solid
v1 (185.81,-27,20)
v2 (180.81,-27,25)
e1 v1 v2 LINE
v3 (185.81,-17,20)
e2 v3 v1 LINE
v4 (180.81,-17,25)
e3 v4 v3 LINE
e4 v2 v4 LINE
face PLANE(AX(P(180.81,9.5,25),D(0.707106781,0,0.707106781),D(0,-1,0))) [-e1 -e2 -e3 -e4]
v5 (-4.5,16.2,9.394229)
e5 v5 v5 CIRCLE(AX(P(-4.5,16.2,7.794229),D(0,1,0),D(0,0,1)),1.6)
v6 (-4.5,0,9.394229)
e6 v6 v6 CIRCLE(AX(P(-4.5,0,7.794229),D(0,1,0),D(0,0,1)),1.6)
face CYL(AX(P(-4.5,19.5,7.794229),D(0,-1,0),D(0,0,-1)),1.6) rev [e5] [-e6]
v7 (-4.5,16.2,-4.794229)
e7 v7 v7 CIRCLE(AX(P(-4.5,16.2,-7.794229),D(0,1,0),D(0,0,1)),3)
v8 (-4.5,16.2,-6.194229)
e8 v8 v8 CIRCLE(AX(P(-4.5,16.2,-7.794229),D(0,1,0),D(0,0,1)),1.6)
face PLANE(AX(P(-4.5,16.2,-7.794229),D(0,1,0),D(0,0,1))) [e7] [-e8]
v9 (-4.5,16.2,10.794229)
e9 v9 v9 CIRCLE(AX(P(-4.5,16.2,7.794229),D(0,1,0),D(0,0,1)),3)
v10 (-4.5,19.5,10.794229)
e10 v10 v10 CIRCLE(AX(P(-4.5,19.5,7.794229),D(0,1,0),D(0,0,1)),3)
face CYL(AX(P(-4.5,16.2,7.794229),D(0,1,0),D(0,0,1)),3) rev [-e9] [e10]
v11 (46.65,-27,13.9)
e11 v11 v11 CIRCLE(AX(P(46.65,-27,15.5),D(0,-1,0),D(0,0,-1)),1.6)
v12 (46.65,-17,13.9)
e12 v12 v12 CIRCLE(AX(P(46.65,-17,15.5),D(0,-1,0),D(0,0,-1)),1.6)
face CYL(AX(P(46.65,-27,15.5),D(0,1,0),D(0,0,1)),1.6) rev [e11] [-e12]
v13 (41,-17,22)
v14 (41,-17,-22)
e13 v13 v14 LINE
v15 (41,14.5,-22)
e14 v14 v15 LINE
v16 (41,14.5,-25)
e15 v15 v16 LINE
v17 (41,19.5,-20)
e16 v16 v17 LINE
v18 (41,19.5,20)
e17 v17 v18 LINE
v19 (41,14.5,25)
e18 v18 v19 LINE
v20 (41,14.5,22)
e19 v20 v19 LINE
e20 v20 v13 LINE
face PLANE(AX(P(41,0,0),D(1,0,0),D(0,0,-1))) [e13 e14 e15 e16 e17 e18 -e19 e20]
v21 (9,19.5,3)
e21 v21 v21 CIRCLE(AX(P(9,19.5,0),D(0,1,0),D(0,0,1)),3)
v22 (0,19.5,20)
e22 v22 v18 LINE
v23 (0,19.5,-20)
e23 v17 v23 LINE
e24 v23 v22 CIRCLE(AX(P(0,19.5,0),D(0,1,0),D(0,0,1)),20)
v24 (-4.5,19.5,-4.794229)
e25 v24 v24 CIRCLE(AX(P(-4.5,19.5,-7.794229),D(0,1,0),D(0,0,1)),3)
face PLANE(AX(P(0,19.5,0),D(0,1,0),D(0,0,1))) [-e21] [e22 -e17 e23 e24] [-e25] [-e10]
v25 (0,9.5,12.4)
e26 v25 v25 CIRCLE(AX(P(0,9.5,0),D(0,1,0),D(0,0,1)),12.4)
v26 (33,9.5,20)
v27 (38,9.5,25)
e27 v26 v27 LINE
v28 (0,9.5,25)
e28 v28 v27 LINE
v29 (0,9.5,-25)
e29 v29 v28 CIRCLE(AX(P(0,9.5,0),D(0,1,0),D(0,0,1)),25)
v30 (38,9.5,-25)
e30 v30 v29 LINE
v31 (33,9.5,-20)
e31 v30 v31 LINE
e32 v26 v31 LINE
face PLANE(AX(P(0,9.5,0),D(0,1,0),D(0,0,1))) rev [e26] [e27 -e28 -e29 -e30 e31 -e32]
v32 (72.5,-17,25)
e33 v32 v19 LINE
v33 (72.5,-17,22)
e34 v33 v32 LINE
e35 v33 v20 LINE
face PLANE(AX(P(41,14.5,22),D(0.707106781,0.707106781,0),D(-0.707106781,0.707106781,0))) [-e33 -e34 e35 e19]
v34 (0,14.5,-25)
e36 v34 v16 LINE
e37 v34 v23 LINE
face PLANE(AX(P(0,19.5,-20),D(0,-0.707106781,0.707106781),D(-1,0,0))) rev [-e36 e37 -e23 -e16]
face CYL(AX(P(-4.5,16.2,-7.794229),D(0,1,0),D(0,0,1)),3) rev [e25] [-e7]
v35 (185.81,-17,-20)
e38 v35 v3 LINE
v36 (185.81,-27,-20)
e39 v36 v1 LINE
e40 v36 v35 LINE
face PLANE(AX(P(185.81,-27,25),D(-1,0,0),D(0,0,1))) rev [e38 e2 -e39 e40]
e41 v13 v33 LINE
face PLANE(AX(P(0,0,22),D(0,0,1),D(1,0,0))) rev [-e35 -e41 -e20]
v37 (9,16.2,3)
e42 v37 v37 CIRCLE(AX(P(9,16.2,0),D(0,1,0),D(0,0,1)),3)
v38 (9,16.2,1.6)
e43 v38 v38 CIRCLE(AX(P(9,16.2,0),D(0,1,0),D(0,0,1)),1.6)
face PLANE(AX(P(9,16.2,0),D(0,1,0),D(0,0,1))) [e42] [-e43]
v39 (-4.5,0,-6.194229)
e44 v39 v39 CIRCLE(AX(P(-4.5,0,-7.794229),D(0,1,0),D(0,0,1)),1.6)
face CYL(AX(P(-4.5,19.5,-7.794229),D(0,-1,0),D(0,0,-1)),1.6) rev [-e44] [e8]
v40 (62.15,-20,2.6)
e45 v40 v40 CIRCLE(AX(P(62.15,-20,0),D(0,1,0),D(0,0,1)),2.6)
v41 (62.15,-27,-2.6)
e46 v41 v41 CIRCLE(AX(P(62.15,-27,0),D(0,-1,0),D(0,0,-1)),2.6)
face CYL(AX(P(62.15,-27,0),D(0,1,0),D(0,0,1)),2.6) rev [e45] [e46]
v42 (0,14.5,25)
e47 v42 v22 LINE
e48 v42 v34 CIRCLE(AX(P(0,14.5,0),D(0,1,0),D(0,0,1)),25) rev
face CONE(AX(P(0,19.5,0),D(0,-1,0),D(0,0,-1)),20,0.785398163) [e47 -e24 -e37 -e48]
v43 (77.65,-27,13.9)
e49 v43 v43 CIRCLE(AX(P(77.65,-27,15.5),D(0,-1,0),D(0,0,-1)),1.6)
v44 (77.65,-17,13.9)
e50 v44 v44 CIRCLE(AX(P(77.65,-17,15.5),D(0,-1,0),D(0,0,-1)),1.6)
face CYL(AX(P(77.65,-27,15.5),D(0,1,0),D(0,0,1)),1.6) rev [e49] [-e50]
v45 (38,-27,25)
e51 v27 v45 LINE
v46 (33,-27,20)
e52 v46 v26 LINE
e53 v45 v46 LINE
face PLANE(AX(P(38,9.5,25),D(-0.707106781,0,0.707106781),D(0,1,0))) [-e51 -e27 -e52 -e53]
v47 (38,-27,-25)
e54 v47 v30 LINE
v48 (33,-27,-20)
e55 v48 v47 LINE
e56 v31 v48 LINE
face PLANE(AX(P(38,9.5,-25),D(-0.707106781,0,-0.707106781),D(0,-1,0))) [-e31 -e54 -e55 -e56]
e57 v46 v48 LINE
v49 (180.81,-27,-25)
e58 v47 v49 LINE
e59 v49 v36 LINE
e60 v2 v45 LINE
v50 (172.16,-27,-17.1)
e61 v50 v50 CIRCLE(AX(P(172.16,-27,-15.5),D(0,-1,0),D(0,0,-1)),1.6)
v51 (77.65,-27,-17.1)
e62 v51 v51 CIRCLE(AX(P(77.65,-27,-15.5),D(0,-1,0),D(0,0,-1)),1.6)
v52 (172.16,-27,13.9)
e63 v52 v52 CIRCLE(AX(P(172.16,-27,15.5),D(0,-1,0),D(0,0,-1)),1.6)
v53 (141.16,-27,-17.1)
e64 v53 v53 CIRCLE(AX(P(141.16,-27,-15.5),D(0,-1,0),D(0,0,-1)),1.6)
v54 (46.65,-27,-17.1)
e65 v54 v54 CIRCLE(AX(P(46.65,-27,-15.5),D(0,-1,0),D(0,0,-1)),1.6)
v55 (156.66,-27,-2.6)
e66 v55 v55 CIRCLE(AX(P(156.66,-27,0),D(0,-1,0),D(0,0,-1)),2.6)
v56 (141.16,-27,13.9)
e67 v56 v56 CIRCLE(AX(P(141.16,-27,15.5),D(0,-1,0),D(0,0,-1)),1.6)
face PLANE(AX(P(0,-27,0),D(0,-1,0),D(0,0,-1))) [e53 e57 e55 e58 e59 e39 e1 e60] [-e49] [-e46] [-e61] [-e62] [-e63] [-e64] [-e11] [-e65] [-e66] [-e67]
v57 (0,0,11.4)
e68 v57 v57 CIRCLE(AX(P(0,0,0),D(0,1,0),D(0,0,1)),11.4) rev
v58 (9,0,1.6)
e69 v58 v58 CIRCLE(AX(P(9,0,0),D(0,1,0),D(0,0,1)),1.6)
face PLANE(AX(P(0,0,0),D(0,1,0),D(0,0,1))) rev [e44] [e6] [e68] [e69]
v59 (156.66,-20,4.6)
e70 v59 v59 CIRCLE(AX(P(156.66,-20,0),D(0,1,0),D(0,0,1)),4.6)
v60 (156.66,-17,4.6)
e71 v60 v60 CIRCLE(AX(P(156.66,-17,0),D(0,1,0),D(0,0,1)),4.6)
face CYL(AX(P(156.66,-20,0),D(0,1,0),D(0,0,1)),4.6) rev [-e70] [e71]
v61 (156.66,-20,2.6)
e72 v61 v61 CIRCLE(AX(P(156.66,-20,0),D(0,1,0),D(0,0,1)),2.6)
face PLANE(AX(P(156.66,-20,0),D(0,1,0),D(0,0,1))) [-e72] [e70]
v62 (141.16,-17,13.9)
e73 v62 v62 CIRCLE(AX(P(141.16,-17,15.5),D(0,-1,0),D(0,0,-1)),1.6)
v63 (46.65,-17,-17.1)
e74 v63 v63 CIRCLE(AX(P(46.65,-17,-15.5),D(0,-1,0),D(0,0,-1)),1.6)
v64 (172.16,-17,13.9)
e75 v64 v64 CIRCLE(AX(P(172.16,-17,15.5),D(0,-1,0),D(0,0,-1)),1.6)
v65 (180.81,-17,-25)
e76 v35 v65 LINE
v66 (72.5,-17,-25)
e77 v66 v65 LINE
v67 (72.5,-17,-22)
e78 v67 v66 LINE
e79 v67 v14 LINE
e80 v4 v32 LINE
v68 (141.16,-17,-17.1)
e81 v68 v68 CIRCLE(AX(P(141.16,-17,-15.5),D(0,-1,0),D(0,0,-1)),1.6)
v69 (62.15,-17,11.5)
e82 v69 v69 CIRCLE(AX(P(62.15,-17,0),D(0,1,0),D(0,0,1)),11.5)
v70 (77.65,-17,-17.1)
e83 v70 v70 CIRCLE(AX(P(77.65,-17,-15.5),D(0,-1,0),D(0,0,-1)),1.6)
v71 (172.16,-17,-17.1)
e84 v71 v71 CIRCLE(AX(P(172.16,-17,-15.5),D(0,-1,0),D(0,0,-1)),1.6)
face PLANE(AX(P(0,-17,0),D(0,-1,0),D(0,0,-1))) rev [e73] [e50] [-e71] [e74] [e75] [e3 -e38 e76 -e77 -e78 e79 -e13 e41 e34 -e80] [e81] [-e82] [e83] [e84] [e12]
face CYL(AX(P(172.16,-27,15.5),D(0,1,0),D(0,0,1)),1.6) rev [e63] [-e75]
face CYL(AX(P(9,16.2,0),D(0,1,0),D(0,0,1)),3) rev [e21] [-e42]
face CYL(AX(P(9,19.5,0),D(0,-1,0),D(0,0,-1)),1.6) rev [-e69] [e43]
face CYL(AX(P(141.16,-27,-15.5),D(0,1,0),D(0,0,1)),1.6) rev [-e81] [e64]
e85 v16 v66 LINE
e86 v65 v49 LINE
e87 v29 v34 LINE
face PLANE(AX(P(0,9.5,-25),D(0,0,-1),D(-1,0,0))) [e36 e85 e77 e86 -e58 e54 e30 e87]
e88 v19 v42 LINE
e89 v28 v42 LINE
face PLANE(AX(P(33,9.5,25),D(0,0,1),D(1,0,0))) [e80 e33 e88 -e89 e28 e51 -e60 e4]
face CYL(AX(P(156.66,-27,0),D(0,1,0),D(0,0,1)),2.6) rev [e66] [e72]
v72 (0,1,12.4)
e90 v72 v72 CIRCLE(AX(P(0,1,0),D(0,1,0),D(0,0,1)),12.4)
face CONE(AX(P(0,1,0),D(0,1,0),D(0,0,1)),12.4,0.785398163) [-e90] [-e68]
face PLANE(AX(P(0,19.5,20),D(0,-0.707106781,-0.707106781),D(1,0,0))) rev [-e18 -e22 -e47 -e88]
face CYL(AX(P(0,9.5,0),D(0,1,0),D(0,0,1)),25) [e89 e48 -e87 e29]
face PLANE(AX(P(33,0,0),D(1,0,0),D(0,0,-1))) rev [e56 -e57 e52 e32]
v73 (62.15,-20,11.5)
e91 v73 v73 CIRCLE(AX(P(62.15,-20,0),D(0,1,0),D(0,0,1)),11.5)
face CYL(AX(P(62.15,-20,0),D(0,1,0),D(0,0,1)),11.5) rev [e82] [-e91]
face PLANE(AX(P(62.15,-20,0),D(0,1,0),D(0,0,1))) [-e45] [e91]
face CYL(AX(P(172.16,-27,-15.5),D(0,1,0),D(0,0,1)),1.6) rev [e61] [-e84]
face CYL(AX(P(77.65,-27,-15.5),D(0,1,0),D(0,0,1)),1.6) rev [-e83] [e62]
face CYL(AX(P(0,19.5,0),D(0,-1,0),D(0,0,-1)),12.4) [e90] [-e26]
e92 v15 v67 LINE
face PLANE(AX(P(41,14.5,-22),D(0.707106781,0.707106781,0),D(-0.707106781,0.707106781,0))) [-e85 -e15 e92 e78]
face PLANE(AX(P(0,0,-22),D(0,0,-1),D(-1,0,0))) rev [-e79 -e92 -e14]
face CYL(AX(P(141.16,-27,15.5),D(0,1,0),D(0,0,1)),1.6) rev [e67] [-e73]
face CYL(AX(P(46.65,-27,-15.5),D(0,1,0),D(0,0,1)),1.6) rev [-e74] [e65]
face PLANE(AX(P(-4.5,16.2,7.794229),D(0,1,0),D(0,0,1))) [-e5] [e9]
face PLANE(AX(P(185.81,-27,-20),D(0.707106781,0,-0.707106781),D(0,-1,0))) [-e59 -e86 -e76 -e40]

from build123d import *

# Parameters (mm, degrees)
SKETCH_1_R          = 12.4
SKETCH_1_R_2        = 1.6
EXTRUDE_1_DEPTH     = 19.5
EXTRUDE_START       = -10
SKETCH_4_R          = 12.4
EXTRUDE_3_DEPTH     = 10
SKETCH_5_W          = 50
SKETCH_5_H          = 36.5
EXTRUDE_4_DEPTH     = 8
SKETCH_6_W          = 152.81
SKETCH_6_H          = 50
SKETCH_6_R          = 2.6
SKETCH_6_R_2        = 1.6
EXTRUDE_5_DEPTH     = 10
SKETCH_7_R          = 4.6
CUT_EXTRUDE_1_DEPTH = 3
CHAMFER_2_SIZE      = 5
EXTRUDE_6_DEPTH     = 3
EXTRUDE_7_DEPTH     = 3
CHAMFER_3_SIZE      = 5
CHAMFER_4_SIZE      = 5
SKETCH_13_R         = 11.5
CUT_EXTRUDE_3_DEPTH = 3
CHAMFER_6_SIZE      = 1
SKETCH_18_R         = 3
CUT_EXTRUDE_6_DEPTH = 3.3


with BuildPart() as part:
    # 草图1 → 凸台-拉伸1 (new body)
    with BuildSketch(Plane(origin=(0, 0, 0), x_dir=(1, 0, 0), z_dir=(0, 1, 0))):
        Circle(SKETCH_1_R)
        with Locations((9, 0)):
            Circle(SKETCH_1_R_2, mode=Mode.SUBTRACT)
        with Locations((-4.5, -7.794228634)):
            Circle(SKETCH_1_R_2, mode=Mode.SUBTRACT)
        with Locations((-4.5, 7.794228634)):
            Circle(SKETCH_1_R_2, mode=Mode.SUBTRACT)
    extrude(amount=EXTRUDE_1_DEPTH)

    # 草图4 → 凸台-拉伸3 (add)
    with BuildSketch(Plane(origin=(0, 19.5, 0), x_dir=(1, 0, 0), z_dir=(0, 1, 0)).offset(EXTRUDE_START)):
        with BuildLine():
            Line((0, 25), (33, 25))
            Line((33, 25), (33, -25))
            Line((33, -25), (0, -25))
            ThreePointArc((0, -25), (-25, 0), (0, 25))
        make_face()
        Circle(SKETCH_4_R, mode=Mode.SUBTRACT)
    extrude(amount=EXTRUDE_3_DEPTH)

    # 草图5 → 凸台-拉伸4 (add)
    with BuildSketch(Plane(origin=(33, 0, 0), x_dir=(0, 0, -1), z_dir=(1, 0, 0))):
        with Locations((0, 1.25)):
            Rectangle(SKETCH_5_W, SKETCH_5_H)
    extrude(amount=EXTRUDE_4_DEPTH)

    # 草图6 → 凸台-拉伸5 (add)
    with BuildSketch(Plane.XZ.offset(17)):
        with Locations((109.405, 0)):
            Rectangle(SKETCH_6_W, SKETCH_6_H)
        with Locations((62.15, 0)):
            Circle(SKETCH_6_R, mode=Mode.SUBTRACT)
        with Locations((156.66, 0)):
            Circle(SKETCH_6_R, mode=Mode.SUBTRACT)
        with Locations((46.65, 15.5)):
            Circle(SKETCH_6_R_2, mode=Mode.SUBTRACT)
        with Locations((77.65, 15.5)):
            Circle(SKETCH_6_R_2, mode=Mode.SUBTRACT)
        with Locations((77.65, -15.5)):
            Circle(SKETCH_6_R_2, mode=Mode.SUBTRACT)
        with Locations((46.65, -15.5)):
            Circle(SKETCH_6_R_2, mode=Mode.SUBTRACT)
        with Locations((141.16, 15.5)):
            Circle(SKETCH_6_R_2, mode=Mode.SUBTRACT)
        with Locations((172.16, 15.5)):
            Circle(SKETCH_6_R_2, mode=Mode.SUBTRACT)
        with Locations((172.16, -15.5)):
            Circle(SKETCH_6_R_2, mode=Mode.SUBTRACT)
        with Locations((141.16, -15.5)):
            Circle(SKETCH_6_R_2, mode=Mode.SUBTRACT)
    extrude(amount=EXTRUDE_5_DEPTH)

    # 草图7 → 切除-拉伸1 (cut)
    with BuildSketch(Plane(origin=(0, -17, 0), x_dir=(1, 0, 0), z_dir=(0, 1, 0))):
        with Locations((156.66, 0)):
            Circle(SKETCH_7_R)
    extrude(amount=-CUT_EXTRUDE_1_DEPTH, mode=Mode.SUBTRACT)

    # 倒角2
    chamfer_2_edges = [part.edges().sort_by_distance(p)[0] for p in [
        (20.5, 19.5, -25),
        (20.5, 19.5, 25),
        (-25, 19.5, 0),
    ]]
    chamfer(chamfer_2_edges, length=CHAMFER_2_SIZE)

    # 草图9 → 凸台-拉伸6 (add)
    with BuildSketch(Plane.XY.offset(25)):
        Polygon((41, 14.5), (72.5, -17), (41, -17), align=None)
    extrude(amount=-EXTRUDE_6_DEPTH)

    # 草图10 → 凸台-拉伸7 (add)
    with BuildSketch(Plane(origin=(0, 0, -25), x_dir=(-1, 0, 0), z_dir=(0, 0, -1))):
        Polygon((-41, -17), (-41, 14.5), (-72.5, -17), align=None)
    extrude(amount=-EXTRUDE_7_DEPTH)

    # 倒角3
    chamfer_3_edges = [part.edges().sort_by_distance(p)[0] for p in [
        (33, -8.75, 25),
        (33, -8.75, -25),
    ]]
    chamfer(chamfer_3_edges, length=CHAMFER_3_SIZE)

    # 倒角4
    chamfer_4_edges = [part.edges().sort_by_distance(p)[0] for p in [
        (185.81, -22, 25),
        (185.81, -22, -25),
    ]]
    chamfer(chamfer_4_edges, length=CHAMFER_4_SIZE)

    # 草图13 → 切除-拉伸3 (cut)
    with BuildSketch(Plane(origin=(0, -17, 0), x_dir=(1, 0, 0), z_dir=(0, 1, 0))):
        with Locations((62.15, 0)):
            Circle(SKETCH_13_R)
    extrude(amount=-CUT_EXTRUDE_3_DEPTH, mode=Mode.SUBTRACT)

    # 倒角6
    chamfer_6_edges = [part.edges().sort_by_distance(p)[0] for p in [
        (-12.4, 0, 0),
    ]]
    chamfer(chamfer_6_edges, length=CHAMFER_6_SIZE)

    # 草图18 → 切除-拉伸6 (cut)
    with BuildSketch(Plane(origin=(0, 19.5, 0), x_dir=(1, 0, 0), z_dir=(0, 1, 0))):
        with Locations((-4.5, 7.794228634)):
            Circle(SKETCH_18_R)
        with Locations((-4.5, -7.794228634)):
            Circle(SKETCH_18_R)
        with Locations((9, 0)):
            Circle(SKETCH_18_R)
    extrude(amount=-CUT_EXTRUDE_6_DEPTH, mode=Mode.SUBTRACT)


solid = part.part
